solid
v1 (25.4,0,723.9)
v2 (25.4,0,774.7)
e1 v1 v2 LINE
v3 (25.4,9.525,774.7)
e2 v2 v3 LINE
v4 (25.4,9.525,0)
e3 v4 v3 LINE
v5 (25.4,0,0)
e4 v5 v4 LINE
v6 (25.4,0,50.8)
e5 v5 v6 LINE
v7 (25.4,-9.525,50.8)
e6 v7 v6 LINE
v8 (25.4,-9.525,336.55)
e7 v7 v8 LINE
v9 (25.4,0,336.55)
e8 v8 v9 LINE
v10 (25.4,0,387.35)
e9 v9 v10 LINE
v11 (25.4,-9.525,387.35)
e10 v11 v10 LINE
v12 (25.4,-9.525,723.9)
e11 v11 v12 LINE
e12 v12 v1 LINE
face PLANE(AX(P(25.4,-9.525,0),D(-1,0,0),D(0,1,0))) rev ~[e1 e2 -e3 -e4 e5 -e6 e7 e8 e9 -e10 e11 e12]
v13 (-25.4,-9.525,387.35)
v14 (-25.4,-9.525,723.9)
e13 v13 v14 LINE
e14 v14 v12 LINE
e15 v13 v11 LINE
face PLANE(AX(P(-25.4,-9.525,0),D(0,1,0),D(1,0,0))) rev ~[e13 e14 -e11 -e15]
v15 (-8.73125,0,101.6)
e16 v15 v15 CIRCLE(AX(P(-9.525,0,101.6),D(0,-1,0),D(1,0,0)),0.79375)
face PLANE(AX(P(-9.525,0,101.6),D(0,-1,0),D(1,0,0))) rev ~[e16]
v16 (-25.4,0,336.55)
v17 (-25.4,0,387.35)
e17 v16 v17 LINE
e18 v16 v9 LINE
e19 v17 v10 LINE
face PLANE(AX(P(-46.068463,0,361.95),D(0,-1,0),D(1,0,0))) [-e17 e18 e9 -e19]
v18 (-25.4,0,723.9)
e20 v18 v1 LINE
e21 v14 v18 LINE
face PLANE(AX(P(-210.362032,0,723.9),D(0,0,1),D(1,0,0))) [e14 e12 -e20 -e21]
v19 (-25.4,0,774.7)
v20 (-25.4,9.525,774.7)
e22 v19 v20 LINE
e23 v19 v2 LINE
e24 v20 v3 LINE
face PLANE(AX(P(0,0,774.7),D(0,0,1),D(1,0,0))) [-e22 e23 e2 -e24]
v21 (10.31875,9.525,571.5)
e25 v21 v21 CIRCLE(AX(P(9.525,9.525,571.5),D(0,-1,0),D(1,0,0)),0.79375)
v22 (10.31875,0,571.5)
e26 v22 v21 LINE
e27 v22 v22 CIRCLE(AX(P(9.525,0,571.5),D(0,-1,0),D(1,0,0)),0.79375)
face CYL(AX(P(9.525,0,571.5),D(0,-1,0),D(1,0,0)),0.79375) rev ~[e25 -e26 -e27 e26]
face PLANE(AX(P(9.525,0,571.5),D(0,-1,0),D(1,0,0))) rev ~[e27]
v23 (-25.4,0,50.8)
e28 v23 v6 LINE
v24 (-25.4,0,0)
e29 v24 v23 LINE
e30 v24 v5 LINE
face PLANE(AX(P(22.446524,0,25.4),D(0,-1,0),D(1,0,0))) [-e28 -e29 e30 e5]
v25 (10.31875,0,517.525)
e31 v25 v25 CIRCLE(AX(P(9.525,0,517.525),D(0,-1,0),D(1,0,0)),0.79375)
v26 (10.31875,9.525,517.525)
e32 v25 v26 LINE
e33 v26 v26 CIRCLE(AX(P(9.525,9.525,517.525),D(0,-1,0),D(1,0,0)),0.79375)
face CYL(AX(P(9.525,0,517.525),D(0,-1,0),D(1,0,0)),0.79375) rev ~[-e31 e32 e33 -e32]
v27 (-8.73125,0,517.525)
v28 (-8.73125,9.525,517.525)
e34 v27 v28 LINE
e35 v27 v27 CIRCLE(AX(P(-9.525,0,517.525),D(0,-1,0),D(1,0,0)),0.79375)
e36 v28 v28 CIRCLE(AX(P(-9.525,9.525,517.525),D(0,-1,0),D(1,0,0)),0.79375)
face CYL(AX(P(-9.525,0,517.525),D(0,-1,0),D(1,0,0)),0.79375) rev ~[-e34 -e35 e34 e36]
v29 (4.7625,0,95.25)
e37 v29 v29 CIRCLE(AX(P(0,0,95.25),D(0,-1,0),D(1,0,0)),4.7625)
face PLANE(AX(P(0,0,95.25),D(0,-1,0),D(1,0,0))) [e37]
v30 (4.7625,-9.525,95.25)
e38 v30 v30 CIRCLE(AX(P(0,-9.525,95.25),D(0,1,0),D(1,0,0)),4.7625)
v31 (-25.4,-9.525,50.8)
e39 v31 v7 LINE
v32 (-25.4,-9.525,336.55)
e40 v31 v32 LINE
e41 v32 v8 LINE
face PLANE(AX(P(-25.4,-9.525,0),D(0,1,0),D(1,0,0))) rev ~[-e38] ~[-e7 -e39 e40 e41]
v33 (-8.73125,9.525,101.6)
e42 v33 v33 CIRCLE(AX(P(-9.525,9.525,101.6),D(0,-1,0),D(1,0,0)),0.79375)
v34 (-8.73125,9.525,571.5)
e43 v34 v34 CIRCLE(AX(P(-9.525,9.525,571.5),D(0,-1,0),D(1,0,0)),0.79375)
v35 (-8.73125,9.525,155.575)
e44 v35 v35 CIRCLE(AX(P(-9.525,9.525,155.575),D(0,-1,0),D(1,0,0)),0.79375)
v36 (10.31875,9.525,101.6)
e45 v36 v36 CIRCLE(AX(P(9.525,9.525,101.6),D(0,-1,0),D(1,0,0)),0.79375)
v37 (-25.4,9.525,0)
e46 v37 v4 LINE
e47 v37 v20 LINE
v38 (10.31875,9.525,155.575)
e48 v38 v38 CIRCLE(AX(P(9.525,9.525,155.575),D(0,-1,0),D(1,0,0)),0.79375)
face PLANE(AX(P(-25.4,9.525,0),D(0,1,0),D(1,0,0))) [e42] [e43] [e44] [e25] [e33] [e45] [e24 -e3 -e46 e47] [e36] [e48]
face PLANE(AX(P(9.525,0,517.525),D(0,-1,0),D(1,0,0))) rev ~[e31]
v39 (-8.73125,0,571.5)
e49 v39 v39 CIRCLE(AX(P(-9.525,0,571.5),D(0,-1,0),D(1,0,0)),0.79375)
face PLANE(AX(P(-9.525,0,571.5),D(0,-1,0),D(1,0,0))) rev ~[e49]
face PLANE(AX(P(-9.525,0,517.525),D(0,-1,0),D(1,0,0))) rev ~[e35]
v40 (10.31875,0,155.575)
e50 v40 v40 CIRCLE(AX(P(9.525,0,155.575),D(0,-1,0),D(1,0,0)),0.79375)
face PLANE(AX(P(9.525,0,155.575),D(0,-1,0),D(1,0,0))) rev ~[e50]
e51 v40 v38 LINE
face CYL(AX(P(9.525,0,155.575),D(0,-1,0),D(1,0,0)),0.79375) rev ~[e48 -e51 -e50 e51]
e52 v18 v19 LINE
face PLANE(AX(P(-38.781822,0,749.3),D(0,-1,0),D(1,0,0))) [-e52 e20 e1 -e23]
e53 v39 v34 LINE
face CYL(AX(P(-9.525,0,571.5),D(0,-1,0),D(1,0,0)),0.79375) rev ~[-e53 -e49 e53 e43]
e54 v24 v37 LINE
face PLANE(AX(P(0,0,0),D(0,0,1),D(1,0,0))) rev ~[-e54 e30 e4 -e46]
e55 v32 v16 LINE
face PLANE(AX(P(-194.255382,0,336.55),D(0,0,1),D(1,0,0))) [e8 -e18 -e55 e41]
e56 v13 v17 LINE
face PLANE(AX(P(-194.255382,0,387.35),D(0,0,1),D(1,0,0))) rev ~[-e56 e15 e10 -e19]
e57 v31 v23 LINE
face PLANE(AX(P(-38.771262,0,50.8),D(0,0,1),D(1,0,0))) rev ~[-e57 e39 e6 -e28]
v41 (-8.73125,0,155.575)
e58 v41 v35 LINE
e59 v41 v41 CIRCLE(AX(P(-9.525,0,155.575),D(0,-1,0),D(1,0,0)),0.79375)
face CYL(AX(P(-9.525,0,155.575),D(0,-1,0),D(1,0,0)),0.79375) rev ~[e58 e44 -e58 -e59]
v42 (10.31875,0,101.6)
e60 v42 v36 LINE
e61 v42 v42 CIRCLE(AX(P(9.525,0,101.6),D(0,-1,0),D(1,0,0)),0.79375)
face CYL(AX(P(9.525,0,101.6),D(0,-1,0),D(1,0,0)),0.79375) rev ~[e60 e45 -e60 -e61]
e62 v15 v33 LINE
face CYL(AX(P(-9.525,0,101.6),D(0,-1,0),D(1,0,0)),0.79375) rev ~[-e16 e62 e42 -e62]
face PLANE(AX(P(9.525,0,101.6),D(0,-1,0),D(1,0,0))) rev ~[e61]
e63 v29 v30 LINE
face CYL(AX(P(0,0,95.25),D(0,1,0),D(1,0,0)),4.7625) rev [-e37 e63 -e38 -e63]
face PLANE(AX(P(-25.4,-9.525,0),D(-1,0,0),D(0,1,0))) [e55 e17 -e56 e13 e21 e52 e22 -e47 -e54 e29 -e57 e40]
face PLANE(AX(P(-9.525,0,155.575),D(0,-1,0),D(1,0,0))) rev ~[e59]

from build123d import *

# Parameters (mm, degrees)
F0_W     = 50.8
F0_H     = 19.05
F1_DEPTH = 774.7
F2_W     = 122.43557321
F2_H     = 50.8
F2_W_2   = 343.1604206562
F2_W_3   = 296.3738366961
F3_DEPTH = 25.4
F4_R     = 0.79375
F5_DEPTH = 25.4
F6_R     = 4.7625
F7_DEPTH = 25.4


# Not quite as in the source:
# - a feature names something its author has since deleted; it is built from what else it names


with BuildPart() as f1:
    # F0 (on Top) → F1 (new body)
    with BuildSketch(Plane.XY):
        Rectangle(F0_W, F0_H)
    extrude(amount=F1_DEPTH)

    # F2 (on Front) → F3 (cut)
    with BuildSketch(Plane.XZ):
        with Locations((22.4465244144, 25.4)):
            Rectangle(F2_W, F2_H)
        with Locations((-38.7818217278, 749.3)):
            Rectangle(F2_W_2, F2_H)
        with Locations((-46.0684634745, 361.95)):
            Rectangle(F2_W_3, F2_H)
    extrude(amount=F3_DEPTH, mode=Mode.SUBTRACT)

    # F4 (on Front) → F5 (cut)
    with BuildSketch(Plane.XZ):
        with Locations((9.525, 101.6)):
            Circle(F4_R)
        with Locations((9.525, 155.575)):
            Circle(F4_R)
        with Locations((9.525, 517.525)):
            Circle(F4_R)
        with Locations((9.525, 571.5)):
            Circle(F4_R)
        with Locations((-9.525, 517.525)):
            Circle(F4_R)
        with Locations((-9.525, 571.5)):
            Circle(F4_R)
        with Locations((-9.525, 101.6)):
            Circle(F4_R)
        with Locations((-9.525, 155.575)):
            Circle(F4_R)
    extrude(amount=-F5_DEPTH, mode=Mode.SUBTRACT)

    # F6 (on Front) → F7 (cut)
    with BuildSketch(Plane.XZ):
        with Locations((0, 95.25)):
            Circle(F6_R)
        with Locations((0, 361.95)):
            Circle(F6_R)
    extrude(amount=F7_DEPTH, mode=Mode.SUBTRACT)


solid = f1.part
